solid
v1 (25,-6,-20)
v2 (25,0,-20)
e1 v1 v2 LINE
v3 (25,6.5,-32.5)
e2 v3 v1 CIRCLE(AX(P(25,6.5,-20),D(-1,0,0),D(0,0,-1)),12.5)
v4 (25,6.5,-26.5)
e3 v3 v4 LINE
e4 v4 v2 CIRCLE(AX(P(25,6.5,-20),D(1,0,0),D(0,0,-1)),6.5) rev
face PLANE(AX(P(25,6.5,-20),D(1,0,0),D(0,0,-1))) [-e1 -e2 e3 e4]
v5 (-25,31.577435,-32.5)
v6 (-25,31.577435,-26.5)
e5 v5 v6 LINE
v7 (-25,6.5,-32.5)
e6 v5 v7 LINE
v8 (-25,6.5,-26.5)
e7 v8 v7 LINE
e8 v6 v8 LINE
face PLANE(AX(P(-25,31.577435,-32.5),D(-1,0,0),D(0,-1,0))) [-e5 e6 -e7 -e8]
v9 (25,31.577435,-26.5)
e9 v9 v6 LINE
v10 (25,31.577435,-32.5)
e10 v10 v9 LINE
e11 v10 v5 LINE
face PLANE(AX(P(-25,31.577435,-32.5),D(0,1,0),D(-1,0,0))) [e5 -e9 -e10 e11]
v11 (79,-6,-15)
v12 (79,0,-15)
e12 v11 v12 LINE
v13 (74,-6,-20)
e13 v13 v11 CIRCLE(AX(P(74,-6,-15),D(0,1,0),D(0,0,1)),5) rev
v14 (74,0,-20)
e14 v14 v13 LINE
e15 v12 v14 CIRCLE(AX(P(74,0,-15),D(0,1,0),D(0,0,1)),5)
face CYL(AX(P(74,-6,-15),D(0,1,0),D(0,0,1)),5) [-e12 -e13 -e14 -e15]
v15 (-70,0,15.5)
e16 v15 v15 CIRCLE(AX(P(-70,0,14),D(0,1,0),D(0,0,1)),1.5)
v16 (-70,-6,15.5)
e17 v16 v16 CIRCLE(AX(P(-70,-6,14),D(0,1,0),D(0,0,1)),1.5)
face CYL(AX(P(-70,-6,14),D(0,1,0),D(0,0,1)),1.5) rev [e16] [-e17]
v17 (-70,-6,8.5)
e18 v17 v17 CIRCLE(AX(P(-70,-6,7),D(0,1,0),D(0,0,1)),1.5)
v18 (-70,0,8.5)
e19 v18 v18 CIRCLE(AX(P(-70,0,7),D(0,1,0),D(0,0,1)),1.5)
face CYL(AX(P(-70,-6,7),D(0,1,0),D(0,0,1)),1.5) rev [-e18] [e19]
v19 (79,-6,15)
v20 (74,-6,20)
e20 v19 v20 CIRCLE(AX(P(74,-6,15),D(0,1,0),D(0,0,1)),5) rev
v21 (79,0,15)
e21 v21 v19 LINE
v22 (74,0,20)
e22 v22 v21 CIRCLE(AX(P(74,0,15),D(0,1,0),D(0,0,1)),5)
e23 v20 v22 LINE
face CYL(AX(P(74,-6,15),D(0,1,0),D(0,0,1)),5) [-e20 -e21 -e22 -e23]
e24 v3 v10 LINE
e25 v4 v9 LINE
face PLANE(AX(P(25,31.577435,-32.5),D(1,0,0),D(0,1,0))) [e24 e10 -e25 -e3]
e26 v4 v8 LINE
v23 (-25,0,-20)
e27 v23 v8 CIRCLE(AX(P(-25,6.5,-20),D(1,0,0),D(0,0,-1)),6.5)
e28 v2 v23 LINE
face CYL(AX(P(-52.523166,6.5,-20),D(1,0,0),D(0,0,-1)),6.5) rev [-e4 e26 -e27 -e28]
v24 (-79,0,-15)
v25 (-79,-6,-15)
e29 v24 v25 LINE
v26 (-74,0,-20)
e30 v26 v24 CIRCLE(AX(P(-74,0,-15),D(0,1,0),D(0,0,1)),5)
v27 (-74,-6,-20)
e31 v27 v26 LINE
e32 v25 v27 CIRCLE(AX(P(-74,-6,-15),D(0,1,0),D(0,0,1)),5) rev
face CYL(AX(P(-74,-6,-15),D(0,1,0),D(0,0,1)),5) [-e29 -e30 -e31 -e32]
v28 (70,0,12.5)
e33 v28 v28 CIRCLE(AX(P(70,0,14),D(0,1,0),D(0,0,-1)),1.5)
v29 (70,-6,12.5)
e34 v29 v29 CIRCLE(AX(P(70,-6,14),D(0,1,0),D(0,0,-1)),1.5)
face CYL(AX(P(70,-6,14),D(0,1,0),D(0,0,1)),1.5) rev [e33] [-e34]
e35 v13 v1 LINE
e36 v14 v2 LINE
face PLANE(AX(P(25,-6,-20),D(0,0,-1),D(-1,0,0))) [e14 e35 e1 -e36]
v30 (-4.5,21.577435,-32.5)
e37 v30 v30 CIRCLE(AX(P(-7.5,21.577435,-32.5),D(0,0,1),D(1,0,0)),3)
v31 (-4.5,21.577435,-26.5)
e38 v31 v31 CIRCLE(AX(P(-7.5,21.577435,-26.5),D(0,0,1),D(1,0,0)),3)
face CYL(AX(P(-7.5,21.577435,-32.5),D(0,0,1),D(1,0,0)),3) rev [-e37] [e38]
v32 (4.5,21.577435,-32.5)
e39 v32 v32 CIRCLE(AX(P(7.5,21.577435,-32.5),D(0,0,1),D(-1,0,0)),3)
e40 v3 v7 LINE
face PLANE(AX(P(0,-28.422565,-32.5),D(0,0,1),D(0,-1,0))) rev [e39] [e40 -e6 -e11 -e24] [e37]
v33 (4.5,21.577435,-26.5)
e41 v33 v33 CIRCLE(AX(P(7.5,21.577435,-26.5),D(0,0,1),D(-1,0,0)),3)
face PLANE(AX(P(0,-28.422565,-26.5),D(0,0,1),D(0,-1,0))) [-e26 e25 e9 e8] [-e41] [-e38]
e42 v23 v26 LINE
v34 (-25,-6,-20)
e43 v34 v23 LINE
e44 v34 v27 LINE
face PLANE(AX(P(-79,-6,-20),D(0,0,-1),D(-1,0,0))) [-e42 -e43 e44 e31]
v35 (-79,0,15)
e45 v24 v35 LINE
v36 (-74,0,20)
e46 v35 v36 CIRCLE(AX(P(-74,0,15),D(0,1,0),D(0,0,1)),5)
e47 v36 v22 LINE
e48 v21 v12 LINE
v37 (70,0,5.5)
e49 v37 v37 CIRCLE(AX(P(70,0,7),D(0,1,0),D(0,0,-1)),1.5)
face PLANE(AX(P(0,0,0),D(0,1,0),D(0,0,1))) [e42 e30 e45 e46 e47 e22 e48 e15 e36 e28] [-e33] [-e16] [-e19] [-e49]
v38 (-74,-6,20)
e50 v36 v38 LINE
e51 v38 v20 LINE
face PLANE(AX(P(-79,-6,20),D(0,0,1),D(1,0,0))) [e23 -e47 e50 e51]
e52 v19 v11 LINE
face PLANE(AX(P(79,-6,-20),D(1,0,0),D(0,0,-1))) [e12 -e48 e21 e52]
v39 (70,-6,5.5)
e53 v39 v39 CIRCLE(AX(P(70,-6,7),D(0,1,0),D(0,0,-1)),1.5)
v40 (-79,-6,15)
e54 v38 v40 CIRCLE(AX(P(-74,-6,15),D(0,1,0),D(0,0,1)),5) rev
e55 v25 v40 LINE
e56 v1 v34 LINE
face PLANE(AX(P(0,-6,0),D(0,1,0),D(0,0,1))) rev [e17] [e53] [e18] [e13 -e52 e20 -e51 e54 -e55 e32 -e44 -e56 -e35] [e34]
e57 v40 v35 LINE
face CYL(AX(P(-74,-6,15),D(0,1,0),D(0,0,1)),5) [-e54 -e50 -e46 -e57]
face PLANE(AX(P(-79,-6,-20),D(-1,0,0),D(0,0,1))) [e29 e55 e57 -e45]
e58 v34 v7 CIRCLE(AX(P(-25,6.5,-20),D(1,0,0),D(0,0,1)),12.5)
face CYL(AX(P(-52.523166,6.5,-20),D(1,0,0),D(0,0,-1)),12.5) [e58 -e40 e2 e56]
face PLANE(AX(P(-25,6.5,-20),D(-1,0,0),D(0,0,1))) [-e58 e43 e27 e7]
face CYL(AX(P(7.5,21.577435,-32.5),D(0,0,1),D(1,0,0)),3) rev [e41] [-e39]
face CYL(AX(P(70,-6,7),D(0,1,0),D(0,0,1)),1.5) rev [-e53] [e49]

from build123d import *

# Parameters (mm, degrees)
BASE_FLANGE1_DEPTH     = 6
SKETCHED_START         = -25
SKETCHED_BEND1_DEPTH   = 50
SKETCHED_BEND1_2_DEPTH = 50
SKETCH7_R              = 1.5
CUT_EXTRUDE1_DEPTH     = 92.073510938
FILLET1_R              = 5
SKETCH8_R              = 3
CUT_EXTRUDE2_DEPTH     = 97.955579492


# Read off the part's stored shape, not the designer's step: Sketched Bend1
# Sheet-metal steps are written as plain solids
with BuildPart() as part:
    # Sketch1 → Base-Flange1 (new body)
    with BuildSketch(Plane(origin=(0, 0, 0), x_dir=(1, 0, 0), z_dir=(0, 1, 0))):
        Polygon((25, 20), (79, 20), (79, -20), (-79, -20), (-79, 20), (-25, 20), (-25, 60), (25, 60), align=None)
    extrude(amount=-BASE_FLANGE1_DEPTH)

    # Sketched Bend1 outline → Sketched Bend1 (cut)
    with BuildSketch(Plane.YZ.offset(SKETCHED_START)):
        with BuildLine():
            Line((0, -60), (0, -30.677078252))
            ThreePointArc((0, -30.677078252), (-4.397247359, -26.123724357), (-6, -20))
            Line((-6, -20), (-6, -60))
            Line((-6, -60), (0, -60))
        make_face()
    extrude(amount=SKETCHED_BEND1_DEPTH, mode=Mode.SUBTRACT)

    # Sketched Bend1 2 outline → Sketched Bend1 2 (add)
    with BuildSketch(Plane.YZ.offset(SKETCHED_START)):
        with BuildLine():
            Line((6.5, -32.5), (31.577434895, -32.5))
            Line((31.577434895, -32.5), (31.577434895, -26.5))
            Line((31.577434895, -26.5), (6.5, -26.5))
            ThreePointArc((6.5, -26.5), (1.903805922, -24.596194078), (0, -20))
            Line((0, -20), (0, -30.677078252))
            ThreePointArc((0, -30.677078252), (3.124609515, -32.035644523), (6.5, -32.5))
        make_face()
    extrude(amount=SKETCHED_BEND1_2_DEPTH)

    # Sketch7 → Cut-Extrude1 (cut, through all)
    with BuildSketch(Plane(origin=(0, 0, 0), x_dir=(1, 0, 0), z_dir=(0, 1, 0))):
        with Locations(Location((-70, -7, 0), (0, 0, 270))):
            Circle(SKETCH7_R)
        with Locations(Location((-70, -14, 0), (0, 0, 270))):
            Circle(SKETCH7_R)
        with Locations(Location((70, -14, 0), (0, 0, 90))):
            Circle(SKETCH7_R)
        with Locations(Location((70, -7, 0), (0, 0, 90))):
            Circle(SKETCH7_R)
    extrude(amount=-CUT_EXTRUDE1_DEPTH, mode=Mode.SUBTRACT)

    # Fillet1
    fillet1_edges = [part.edges().sort_by_distance(p)[0] for p in [
        (-79, -3, 20),
        (79, -3, 20),
        (79, -3, -20),
        (-79, -3, -20),
    ]]
    fillet(fillet1_edges, radius=FILLET1_R)

    # Sketch8 → Cut-Extrude2 (cut, through all)
    with BuildSketch(Plane.XY.offset(-26.5)):
        with Locations((-7.5, 21.577434895)):
            Circle(SKETCH8_R)
        with Locations(Location((7.5, 21.577434895, 0), (0, 0, 180))):
            Circle(SKETCH8_R)
    extrude(amount=-CUT_EXTRUDE2_DEPTH, mode=Mode.SUBTRACT)


solid = part.part
